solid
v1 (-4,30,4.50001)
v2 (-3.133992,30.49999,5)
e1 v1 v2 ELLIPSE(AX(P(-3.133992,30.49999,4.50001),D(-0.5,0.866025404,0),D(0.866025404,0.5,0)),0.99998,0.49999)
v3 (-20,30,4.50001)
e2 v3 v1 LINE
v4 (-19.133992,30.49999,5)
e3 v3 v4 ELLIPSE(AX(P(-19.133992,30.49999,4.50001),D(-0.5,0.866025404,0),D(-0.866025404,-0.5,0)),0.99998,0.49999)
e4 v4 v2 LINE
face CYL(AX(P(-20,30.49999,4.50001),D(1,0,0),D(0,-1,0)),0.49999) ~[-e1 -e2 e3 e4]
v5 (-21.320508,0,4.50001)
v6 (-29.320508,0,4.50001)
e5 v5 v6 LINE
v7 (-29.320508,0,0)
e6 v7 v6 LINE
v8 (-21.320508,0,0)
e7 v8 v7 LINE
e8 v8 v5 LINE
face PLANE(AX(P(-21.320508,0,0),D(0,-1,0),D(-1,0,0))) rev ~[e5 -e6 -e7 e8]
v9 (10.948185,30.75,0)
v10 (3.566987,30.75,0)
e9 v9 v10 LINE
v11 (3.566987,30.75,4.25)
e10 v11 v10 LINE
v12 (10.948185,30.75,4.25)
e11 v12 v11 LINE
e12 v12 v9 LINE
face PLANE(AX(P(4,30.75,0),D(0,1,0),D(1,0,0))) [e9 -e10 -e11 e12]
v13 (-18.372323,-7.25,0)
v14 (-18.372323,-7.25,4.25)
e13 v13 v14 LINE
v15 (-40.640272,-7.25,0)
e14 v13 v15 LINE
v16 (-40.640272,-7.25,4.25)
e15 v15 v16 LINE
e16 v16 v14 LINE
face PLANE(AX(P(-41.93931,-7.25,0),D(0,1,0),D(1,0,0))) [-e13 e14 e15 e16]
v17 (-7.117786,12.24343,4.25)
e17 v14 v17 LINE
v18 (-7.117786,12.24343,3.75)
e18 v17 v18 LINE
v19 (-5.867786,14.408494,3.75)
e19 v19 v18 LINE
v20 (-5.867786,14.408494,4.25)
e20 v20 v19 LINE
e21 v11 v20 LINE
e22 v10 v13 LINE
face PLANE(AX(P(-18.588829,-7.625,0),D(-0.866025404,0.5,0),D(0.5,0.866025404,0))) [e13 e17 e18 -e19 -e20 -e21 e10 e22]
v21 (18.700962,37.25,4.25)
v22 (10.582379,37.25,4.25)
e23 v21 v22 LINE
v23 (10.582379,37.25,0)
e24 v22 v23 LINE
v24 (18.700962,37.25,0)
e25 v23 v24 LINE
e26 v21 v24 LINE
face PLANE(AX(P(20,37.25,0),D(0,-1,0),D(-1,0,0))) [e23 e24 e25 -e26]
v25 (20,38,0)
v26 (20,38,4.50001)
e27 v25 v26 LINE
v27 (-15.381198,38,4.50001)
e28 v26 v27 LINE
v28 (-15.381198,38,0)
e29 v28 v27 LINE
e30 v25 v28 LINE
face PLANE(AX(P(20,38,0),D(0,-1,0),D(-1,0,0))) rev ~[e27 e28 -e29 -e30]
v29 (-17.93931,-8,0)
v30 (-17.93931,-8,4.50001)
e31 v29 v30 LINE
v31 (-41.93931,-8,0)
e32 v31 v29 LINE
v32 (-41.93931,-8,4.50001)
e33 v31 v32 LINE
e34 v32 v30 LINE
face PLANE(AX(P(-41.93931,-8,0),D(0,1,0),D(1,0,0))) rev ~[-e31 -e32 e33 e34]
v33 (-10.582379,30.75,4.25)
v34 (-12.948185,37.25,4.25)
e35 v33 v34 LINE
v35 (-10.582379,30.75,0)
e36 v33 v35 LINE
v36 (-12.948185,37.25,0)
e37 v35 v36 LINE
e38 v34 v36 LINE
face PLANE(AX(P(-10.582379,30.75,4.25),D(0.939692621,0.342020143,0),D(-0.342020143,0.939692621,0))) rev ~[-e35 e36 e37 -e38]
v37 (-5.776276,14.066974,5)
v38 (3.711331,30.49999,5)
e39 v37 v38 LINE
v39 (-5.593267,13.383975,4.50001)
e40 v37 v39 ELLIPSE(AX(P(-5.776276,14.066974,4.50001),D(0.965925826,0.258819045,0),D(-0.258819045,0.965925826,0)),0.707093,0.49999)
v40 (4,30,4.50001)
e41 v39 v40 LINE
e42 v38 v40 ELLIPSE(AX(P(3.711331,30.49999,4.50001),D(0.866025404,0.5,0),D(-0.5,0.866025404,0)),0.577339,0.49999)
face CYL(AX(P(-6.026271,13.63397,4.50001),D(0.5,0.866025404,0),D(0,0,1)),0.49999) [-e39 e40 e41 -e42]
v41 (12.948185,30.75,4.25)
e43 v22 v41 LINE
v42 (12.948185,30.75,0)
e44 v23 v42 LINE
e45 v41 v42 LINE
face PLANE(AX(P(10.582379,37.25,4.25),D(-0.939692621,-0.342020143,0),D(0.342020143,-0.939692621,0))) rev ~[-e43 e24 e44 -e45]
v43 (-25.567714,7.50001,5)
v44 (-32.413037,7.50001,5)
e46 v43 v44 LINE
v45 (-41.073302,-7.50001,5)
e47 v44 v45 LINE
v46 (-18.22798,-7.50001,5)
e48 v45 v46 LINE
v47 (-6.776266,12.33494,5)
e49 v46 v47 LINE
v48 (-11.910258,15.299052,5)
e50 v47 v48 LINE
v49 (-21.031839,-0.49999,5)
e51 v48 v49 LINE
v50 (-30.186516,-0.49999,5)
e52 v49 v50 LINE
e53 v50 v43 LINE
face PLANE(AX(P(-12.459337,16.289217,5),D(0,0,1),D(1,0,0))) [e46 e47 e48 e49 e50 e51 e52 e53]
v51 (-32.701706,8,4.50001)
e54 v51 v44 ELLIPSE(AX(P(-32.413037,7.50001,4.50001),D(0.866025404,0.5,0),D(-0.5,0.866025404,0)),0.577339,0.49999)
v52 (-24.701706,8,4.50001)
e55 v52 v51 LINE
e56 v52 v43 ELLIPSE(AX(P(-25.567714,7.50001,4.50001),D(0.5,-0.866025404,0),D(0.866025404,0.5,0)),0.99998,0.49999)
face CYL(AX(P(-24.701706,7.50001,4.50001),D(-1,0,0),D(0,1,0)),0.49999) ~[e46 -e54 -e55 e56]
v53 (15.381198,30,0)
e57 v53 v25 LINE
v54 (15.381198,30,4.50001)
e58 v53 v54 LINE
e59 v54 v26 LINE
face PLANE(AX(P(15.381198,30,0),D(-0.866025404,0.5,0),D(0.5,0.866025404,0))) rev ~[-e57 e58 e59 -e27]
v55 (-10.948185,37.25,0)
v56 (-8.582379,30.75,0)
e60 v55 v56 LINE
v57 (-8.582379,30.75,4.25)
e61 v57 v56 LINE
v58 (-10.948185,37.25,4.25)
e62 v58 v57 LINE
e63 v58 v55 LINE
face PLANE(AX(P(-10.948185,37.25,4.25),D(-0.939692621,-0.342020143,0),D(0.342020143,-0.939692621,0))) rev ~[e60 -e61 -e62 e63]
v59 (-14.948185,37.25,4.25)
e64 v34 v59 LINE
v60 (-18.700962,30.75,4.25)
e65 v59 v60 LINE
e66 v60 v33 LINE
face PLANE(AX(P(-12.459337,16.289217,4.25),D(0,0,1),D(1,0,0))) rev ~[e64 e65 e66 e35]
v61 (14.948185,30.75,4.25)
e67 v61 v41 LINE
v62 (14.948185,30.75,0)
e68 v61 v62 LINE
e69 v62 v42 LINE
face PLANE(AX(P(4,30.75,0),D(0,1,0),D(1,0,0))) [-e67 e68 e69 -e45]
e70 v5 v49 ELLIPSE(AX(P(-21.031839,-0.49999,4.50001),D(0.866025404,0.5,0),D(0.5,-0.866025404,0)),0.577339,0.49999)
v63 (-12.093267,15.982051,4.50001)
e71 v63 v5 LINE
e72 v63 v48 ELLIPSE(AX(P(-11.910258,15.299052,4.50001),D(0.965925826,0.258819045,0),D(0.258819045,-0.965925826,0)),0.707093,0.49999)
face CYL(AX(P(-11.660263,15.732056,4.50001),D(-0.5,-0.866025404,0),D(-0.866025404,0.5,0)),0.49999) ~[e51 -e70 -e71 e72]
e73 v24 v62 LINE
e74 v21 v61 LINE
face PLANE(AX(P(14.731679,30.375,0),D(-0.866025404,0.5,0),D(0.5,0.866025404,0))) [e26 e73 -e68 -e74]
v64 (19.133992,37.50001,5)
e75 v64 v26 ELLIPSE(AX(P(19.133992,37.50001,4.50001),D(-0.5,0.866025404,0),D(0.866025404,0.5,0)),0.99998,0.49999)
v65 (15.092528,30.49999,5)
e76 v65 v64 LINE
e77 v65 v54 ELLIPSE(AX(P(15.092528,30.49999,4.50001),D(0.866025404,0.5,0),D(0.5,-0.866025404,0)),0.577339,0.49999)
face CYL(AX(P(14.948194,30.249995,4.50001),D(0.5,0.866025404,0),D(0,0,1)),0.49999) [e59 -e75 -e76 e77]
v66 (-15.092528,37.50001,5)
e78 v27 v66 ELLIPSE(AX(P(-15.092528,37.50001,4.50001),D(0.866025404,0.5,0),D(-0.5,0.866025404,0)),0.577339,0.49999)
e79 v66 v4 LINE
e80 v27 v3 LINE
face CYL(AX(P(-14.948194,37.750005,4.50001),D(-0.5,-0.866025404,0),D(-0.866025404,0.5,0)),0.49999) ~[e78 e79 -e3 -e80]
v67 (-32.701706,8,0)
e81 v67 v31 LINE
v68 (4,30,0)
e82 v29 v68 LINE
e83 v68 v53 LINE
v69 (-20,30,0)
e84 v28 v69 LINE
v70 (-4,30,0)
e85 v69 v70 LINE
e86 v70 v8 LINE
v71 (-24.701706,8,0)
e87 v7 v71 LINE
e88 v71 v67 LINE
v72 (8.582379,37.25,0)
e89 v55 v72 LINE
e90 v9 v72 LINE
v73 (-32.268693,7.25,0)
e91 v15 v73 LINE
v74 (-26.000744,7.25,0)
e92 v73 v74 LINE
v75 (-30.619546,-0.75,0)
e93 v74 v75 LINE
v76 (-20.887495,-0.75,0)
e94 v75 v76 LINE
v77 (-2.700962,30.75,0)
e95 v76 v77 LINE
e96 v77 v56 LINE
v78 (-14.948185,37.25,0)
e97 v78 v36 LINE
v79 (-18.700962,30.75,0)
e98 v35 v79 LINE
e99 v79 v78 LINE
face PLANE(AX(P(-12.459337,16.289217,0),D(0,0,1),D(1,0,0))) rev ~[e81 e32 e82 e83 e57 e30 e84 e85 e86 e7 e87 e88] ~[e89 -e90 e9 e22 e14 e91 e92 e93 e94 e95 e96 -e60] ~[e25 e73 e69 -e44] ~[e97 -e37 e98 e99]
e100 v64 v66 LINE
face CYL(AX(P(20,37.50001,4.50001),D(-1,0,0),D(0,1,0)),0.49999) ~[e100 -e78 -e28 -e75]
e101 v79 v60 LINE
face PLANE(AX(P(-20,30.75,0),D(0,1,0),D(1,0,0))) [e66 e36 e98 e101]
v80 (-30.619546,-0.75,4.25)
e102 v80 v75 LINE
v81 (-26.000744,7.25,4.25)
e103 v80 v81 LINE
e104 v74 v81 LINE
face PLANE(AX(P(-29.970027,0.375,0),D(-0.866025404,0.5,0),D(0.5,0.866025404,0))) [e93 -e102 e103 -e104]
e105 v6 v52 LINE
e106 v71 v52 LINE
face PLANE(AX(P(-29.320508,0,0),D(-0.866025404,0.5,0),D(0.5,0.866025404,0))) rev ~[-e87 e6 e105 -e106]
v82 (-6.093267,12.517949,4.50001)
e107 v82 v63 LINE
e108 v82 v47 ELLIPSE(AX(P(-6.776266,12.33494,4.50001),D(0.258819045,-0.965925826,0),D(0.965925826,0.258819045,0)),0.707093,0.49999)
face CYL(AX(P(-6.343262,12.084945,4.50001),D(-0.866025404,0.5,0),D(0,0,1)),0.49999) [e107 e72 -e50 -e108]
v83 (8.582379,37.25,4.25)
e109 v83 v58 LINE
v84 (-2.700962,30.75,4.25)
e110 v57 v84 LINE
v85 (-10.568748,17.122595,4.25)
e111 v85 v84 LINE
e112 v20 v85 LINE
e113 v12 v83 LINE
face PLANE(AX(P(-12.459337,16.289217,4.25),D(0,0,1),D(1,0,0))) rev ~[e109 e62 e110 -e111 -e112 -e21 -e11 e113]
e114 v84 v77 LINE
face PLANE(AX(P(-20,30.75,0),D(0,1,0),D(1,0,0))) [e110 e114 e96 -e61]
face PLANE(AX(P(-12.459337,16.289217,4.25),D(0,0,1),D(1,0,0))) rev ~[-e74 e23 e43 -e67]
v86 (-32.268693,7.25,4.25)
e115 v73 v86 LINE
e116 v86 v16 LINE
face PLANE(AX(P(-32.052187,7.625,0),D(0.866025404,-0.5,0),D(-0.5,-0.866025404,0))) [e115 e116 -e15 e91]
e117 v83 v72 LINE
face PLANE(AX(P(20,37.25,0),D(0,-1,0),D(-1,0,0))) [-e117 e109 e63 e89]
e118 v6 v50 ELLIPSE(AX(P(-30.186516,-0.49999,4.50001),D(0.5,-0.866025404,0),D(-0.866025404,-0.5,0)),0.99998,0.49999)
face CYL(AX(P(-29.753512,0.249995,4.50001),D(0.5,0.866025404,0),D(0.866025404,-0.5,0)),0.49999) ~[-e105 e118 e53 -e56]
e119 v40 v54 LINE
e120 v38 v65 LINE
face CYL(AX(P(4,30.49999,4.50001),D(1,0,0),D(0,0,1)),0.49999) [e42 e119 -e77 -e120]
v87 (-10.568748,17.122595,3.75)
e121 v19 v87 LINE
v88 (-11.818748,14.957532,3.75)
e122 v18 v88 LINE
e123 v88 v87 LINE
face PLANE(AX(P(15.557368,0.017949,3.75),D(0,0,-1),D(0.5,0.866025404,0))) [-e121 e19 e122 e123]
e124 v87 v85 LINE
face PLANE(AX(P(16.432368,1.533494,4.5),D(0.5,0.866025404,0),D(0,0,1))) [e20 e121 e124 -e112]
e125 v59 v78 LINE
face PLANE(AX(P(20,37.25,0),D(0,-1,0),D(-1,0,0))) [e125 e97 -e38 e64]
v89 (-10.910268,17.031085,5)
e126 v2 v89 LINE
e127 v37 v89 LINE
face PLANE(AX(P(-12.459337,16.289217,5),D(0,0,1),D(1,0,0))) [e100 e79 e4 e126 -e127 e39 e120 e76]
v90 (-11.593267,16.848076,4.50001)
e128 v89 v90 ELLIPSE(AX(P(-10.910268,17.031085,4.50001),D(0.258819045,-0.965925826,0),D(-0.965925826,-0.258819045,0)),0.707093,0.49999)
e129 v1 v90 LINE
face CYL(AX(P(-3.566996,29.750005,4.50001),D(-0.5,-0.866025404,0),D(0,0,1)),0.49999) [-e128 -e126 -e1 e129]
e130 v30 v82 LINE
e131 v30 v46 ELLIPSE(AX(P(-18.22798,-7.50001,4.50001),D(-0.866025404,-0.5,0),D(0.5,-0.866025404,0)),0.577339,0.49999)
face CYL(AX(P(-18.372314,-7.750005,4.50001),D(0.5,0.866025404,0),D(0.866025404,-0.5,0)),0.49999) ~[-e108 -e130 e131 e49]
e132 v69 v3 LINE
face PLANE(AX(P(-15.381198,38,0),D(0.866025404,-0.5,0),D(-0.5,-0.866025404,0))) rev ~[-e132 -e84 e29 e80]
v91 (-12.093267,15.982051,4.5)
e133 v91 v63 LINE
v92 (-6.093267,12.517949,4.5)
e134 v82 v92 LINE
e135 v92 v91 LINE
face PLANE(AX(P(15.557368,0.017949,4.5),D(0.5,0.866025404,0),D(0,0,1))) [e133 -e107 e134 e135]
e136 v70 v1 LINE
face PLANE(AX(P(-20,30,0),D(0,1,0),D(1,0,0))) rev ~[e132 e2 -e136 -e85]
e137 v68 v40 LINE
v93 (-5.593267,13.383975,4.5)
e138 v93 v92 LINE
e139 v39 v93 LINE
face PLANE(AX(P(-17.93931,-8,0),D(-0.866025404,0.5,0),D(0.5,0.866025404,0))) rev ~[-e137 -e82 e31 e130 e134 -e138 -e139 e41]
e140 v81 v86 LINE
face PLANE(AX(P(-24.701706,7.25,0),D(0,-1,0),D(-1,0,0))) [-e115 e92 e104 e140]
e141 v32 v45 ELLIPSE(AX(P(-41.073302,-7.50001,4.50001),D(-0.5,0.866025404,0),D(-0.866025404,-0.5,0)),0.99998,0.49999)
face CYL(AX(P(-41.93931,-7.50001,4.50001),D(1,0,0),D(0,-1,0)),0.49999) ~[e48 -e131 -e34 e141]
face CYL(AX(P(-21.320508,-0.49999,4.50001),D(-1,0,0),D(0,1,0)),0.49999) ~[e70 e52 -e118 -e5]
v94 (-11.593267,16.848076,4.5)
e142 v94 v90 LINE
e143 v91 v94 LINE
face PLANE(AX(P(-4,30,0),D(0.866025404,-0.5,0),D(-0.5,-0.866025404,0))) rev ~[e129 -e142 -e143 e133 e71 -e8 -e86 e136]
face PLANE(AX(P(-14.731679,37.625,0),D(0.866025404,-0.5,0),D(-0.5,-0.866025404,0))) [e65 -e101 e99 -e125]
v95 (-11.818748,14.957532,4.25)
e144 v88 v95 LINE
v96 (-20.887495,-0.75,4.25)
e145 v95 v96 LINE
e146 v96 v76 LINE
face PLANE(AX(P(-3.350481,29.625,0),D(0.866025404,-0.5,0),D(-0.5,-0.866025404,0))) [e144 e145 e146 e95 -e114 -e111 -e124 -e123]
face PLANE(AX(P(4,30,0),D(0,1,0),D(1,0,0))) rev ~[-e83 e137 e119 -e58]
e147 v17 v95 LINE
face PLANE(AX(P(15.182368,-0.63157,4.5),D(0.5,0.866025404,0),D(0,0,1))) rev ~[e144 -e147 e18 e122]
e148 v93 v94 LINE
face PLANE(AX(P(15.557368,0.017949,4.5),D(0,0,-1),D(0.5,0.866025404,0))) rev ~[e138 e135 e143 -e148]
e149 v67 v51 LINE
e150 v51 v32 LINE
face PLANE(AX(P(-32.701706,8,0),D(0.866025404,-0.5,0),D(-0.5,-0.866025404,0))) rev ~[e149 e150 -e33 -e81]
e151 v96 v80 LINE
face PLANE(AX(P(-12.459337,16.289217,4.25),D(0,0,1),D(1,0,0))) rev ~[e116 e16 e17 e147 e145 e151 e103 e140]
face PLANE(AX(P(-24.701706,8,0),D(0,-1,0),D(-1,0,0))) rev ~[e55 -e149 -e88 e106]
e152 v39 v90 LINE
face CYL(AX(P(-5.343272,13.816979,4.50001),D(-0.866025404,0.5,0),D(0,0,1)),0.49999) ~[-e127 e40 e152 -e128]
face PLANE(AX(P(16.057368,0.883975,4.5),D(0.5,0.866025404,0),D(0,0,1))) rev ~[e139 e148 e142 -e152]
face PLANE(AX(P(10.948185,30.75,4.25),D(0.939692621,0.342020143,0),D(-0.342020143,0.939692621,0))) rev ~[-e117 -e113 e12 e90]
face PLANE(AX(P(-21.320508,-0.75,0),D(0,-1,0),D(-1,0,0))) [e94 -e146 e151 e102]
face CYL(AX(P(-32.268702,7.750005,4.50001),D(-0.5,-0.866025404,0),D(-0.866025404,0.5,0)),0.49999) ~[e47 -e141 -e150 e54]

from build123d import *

# Parameters (mm, degrees)
F1_DEPTH = 5
F4_W     = 1
F4_H     = 5.3799478337
F5_DEPTH = 100
F6_T     = -0.75
F7_R     = 0.49999
F9_DEPTH = 4.25


# Not quite as in the source:
# - a fillet or chamfer is up to 0.001 mm smaller than in the source, because OpenCascade refuses the exact size


with BuildPart() as f1:
    # F0 (on Top) → F1 (new body)
    with BuildSketch(Plane.XY):
        Polygon((-15.3811978465, 38), (-20, 30), (-4, 30), (-21.3205080757, 0), (-29.3205080757, 0), (-24.7017059222, 8), (-32.7017059222, 8), (-41.9393102292, -8), (-17.9393102292, -8), (4, 30), (15.3811978465, 30), (20, 38), align=None)
    extrude(amount=F1_DEPTH)

    # F4 (on offset) → F5 (cut)
    with BuildSketch(Plane(origin=(11.6602540378, -6.7320508076, 0), x_dir=(0.5, 0.8660254038, 0), z_dir=(0.8660254038, -0.5, 0))):
        with Locations((8.2942286341, 7.1899739169)):
            Rectangle(F4_W, F4_H)
    extrude(amount=-F5_DEPTH, mode=Mode.SUBTRACT)

    # F6
    f6_openings = [f1.faces().sort_by_distance(p)[0] for p in [
        (2.309401, 37.228477, 0),
    ]]
    offset(amount=F6_T, openings=f6_openings, kind=Kind.INTERSECTION)

    # F7 (radius 0.5 in the source; OpenCascade refuses exactly that, so slightly less here)
    f7_edges = [f1.edges().sort_by_distance(p)[0] for p in [
        (-0.796633, 21.691987, 5),
        (9.690599, 30, 5),
        (17.690599, 34, 5),
        (2.309401, 38, 5),
        (-17.690599, 34, 5),
        (-12, 30, 5),
        (-7.796633, 23.424038, 5),
        (-8.593267, 15.116025, 5),
        (-16.706887, 7.991025, 5),
        (-25.320508, 0, 5),
        (-27.011107, 4, 5),
        (-28.701706, 8, 5),
        (-37.320508, 0, 5),
        (-29.93931, -8, 5),
        (-12.016288, 2.258975, 5),
        (-9.093267, 14.25, 5),
    ]]
    fillet(f7_edges, radius=F7_R)

    # F8 (on face) → F9 (join, through all)
    with BuildSketch(Plane(origin=(0, 0, 4.25), x_dir=(1, 0, 0), z_dir=(0, 0, -1))):
        Polygon((-10.5823786219, -30.75), (-12.9481851446, -37.25), (-10.9481851446, -37.25), (-8.5823786219, -30.75), align=None)
        Polygon((10.9481851446, -30.75), (8.5823786219, -37.25), (10.5823786219, -37.25), (12.9481851446, -30.75), align=None)
    extrude(amount=F9_DEPTH)


solid = f1.part
